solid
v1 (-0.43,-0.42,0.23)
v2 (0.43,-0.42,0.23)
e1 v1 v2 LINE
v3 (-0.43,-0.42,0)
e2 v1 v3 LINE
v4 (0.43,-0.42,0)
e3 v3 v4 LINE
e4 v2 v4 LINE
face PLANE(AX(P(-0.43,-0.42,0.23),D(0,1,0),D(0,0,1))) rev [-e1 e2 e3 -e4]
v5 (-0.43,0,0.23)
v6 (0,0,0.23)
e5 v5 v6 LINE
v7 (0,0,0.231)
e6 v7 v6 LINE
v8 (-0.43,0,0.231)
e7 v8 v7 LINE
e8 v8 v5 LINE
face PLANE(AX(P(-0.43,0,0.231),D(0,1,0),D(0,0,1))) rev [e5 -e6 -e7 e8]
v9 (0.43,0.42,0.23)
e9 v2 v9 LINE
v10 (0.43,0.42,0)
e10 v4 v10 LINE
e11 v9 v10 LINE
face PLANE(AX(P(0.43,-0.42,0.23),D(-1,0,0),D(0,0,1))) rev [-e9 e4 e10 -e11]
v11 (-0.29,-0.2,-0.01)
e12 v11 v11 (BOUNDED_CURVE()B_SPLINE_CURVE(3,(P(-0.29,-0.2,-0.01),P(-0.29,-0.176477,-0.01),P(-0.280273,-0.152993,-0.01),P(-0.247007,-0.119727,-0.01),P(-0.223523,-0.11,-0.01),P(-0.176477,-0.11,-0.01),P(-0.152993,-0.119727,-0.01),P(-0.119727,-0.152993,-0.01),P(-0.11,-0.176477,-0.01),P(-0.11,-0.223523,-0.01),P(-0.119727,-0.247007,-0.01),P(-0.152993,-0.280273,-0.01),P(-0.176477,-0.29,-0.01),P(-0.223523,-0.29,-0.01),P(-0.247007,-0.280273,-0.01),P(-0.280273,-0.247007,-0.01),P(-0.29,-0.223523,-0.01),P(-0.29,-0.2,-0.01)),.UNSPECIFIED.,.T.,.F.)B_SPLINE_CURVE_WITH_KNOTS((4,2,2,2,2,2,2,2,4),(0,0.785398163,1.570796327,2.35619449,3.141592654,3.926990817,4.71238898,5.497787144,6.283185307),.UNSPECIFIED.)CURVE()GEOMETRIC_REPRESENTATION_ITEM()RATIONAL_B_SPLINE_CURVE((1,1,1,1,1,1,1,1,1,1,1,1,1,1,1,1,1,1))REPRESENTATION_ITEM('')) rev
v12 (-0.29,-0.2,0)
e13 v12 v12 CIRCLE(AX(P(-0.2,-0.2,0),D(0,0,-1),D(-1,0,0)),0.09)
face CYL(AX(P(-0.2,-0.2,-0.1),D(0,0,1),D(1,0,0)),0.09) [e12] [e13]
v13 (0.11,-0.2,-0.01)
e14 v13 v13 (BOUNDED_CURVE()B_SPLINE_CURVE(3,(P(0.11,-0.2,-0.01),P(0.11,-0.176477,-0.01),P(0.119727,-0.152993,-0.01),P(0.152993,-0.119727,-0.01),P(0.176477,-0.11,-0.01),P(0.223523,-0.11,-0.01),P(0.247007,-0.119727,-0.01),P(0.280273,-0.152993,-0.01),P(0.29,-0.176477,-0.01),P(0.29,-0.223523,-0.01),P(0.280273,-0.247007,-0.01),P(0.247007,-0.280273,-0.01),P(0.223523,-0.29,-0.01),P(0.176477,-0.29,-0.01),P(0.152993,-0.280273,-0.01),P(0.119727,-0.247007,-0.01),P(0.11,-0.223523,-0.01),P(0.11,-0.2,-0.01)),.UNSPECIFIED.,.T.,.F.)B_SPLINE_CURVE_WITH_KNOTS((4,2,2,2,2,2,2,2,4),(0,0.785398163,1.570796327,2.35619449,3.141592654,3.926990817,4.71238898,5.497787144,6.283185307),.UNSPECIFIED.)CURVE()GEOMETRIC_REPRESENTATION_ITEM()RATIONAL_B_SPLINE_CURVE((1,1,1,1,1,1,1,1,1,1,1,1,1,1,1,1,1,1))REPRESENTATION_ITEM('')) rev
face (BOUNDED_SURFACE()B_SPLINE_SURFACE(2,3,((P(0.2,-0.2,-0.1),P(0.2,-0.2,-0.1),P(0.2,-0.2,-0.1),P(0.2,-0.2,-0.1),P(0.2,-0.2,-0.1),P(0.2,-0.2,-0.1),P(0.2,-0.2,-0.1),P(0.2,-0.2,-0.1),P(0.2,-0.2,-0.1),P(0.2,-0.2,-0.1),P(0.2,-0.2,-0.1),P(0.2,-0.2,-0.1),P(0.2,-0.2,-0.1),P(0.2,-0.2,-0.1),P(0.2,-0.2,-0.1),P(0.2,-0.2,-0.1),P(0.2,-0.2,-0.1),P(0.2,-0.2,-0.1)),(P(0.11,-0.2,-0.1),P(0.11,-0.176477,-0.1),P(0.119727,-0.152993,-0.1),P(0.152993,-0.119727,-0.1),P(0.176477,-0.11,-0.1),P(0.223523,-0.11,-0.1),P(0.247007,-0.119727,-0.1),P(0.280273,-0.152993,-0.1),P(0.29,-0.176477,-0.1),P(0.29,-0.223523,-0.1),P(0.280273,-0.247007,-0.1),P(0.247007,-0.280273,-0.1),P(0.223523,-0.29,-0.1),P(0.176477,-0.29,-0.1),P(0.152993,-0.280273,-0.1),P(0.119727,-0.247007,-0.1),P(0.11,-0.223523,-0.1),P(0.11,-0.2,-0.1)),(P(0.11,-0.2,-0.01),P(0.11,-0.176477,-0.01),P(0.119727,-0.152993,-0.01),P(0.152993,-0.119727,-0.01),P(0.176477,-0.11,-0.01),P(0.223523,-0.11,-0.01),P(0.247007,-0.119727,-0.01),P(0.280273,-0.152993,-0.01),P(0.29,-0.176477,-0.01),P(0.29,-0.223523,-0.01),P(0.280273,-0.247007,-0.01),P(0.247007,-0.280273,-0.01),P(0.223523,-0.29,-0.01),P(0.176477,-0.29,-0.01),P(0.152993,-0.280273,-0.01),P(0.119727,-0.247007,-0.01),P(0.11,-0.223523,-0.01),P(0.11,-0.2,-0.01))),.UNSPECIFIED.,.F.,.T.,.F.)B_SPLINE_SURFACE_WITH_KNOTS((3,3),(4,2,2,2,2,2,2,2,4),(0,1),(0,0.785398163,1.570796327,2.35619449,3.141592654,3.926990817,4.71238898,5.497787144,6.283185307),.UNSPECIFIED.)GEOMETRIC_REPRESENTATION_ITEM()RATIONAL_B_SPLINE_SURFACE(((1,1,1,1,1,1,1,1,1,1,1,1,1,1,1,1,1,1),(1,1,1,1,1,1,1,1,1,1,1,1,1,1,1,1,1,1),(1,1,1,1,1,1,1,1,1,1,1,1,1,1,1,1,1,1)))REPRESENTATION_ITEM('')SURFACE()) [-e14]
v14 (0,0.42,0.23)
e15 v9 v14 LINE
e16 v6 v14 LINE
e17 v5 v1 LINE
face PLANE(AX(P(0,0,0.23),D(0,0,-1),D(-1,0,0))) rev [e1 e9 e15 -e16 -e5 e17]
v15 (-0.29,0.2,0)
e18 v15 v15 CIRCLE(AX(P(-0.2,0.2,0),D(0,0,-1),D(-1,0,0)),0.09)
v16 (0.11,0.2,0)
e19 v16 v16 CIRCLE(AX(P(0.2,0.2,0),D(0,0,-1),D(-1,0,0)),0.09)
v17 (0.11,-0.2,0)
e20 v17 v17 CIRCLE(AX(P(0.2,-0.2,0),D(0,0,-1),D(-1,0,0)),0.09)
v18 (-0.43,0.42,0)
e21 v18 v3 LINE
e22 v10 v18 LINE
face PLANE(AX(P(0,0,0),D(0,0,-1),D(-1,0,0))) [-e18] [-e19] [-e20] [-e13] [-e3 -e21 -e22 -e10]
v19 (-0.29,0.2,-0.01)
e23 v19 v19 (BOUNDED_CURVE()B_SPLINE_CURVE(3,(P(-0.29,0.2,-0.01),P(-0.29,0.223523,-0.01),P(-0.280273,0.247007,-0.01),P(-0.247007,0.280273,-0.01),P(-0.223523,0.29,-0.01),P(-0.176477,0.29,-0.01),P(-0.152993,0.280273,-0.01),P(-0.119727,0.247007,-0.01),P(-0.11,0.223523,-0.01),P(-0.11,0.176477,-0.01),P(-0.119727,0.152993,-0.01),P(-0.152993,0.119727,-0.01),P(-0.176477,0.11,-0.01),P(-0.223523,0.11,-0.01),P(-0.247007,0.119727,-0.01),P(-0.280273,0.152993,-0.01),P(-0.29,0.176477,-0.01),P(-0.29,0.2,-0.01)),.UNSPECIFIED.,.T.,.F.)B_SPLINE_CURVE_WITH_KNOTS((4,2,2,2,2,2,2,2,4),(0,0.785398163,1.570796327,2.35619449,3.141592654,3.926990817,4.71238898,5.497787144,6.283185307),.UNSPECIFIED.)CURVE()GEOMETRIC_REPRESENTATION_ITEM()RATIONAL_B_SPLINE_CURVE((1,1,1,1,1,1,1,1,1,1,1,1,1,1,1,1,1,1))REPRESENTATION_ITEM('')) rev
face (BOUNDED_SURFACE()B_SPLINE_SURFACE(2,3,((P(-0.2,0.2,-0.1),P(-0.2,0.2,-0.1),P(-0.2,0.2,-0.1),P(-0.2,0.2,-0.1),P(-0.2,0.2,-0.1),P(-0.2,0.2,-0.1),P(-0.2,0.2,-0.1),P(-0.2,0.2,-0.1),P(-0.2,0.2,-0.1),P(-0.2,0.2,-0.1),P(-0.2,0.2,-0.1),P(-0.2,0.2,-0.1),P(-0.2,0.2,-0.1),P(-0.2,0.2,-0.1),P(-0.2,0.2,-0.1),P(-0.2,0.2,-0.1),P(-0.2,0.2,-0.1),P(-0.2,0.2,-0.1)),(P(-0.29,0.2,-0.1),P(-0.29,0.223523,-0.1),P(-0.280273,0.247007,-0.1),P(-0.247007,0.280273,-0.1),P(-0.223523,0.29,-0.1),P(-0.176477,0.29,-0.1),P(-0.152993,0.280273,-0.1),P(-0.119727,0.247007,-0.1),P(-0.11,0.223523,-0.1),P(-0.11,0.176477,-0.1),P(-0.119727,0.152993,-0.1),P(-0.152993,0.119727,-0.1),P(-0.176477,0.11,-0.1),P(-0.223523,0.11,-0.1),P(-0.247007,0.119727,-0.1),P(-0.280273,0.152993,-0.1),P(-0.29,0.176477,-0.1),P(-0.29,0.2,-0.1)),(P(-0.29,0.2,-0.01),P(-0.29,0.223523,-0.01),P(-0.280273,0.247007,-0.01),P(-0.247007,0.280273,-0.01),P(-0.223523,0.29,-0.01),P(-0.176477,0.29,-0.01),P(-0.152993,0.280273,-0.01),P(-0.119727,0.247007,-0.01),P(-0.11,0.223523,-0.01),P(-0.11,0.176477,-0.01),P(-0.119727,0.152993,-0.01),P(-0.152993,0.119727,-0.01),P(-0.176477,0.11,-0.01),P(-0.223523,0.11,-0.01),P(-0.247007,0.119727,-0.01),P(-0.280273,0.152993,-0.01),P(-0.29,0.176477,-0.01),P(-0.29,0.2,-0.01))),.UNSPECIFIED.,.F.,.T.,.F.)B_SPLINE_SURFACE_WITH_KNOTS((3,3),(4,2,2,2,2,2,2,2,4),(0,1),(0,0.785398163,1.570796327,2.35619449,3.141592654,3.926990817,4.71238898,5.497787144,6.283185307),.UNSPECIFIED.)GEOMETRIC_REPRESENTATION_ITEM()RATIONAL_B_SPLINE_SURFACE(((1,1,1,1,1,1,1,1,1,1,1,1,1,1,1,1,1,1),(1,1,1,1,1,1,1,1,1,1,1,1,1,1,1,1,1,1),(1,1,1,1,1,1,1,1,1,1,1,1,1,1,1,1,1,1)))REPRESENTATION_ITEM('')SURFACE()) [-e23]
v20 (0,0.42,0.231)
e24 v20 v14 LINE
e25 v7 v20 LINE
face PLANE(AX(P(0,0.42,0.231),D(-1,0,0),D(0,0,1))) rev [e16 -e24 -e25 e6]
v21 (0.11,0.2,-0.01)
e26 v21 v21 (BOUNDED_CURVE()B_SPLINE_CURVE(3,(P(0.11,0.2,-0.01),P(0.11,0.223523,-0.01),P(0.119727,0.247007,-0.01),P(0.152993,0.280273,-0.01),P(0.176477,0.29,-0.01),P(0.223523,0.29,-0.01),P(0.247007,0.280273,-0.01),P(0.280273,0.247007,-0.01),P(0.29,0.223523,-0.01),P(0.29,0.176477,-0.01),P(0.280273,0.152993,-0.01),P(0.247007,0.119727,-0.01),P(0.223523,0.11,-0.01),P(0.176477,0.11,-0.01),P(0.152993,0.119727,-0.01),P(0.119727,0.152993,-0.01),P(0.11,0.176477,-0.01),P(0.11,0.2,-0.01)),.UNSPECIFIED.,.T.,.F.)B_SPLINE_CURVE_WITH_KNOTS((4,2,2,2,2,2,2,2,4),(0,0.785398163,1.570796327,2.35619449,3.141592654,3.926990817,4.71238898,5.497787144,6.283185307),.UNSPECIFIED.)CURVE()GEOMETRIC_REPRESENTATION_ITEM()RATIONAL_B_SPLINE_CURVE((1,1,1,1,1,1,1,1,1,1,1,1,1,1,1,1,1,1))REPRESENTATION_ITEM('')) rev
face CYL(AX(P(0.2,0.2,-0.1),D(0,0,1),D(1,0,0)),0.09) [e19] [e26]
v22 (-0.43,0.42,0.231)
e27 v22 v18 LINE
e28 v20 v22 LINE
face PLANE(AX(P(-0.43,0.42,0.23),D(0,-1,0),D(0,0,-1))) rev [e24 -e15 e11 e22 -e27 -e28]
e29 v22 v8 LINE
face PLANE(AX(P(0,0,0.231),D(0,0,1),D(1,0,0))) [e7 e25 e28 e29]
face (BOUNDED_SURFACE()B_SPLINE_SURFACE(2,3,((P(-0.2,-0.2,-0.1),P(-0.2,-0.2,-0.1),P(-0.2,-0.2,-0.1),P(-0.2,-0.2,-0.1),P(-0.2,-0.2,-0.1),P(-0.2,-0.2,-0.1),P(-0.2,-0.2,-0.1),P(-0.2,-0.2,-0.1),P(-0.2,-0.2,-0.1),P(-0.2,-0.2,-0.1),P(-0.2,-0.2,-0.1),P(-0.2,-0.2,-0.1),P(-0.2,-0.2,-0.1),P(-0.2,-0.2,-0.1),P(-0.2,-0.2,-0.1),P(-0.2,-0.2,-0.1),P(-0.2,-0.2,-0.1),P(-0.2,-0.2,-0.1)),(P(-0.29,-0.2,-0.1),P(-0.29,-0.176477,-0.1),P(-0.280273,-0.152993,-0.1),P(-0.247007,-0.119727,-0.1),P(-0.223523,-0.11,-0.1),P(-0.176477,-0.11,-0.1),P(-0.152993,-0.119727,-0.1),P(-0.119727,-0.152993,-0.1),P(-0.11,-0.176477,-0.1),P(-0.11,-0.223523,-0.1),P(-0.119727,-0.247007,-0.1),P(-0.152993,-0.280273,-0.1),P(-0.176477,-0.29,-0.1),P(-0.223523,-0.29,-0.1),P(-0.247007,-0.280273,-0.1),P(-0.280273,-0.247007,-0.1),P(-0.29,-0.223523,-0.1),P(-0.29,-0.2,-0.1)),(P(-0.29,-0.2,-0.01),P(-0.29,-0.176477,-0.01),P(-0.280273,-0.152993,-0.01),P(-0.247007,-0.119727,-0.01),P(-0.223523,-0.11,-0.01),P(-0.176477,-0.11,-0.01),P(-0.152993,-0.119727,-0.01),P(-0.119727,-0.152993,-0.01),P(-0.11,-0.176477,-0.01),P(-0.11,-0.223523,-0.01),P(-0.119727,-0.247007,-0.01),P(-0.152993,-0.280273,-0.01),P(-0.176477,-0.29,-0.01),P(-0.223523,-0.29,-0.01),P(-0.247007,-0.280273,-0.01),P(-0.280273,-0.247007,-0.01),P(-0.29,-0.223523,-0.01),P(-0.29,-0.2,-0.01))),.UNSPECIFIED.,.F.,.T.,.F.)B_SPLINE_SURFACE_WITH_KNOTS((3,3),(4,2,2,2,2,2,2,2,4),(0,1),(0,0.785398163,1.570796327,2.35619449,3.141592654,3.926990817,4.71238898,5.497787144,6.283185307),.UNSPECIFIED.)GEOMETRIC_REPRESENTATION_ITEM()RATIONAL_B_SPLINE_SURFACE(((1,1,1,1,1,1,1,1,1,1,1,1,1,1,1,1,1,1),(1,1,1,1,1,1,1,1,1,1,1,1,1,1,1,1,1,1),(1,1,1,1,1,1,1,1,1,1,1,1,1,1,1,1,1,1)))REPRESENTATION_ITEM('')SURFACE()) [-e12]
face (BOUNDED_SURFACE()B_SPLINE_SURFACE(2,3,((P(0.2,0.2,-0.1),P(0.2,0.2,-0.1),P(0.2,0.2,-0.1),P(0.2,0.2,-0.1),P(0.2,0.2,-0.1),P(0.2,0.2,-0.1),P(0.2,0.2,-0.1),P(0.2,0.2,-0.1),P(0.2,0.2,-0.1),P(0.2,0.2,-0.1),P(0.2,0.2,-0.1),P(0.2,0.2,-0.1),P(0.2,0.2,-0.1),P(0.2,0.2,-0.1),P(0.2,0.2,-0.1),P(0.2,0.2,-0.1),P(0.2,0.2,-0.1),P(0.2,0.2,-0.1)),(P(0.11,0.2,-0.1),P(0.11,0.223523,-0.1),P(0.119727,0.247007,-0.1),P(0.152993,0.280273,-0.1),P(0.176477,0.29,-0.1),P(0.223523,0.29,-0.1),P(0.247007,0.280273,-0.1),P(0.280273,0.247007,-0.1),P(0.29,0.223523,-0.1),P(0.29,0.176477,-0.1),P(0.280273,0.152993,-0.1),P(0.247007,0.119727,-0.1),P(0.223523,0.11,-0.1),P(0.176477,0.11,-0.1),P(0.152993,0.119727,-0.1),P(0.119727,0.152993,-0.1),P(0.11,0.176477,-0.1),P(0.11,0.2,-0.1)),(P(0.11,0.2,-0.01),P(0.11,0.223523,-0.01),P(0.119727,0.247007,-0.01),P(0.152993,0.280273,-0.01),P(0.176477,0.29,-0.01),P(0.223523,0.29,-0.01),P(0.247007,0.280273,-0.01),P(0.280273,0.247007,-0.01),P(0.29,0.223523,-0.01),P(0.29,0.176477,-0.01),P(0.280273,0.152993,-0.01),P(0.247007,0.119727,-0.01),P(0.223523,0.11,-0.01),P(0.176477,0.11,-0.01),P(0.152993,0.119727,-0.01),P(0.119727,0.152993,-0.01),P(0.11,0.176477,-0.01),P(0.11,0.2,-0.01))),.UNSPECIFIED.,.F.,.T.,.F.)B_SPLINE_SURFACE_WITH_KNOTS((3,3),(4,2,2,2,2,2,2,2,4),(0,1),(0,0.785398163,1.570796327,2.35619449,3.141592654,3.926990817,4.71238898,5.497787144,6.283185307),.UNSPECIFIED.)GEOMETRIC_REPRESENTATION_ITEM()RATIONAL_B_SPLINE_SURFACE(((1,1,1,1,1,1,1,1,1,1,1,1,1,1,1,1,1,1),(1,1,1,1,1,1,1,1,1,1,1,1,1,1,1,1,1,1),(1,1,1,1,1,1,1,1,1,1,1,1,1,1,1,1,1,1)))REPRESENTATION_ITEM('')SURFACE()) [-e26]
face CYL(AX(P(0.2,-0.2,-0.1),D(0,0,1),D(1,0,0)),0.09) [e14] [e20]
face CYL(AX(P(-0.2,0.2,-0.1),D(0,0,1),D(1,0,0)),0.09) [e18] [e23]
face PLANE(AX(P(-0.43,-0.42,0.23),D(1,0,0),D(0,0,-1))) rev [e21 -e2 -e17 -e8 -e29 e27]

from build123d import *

# Parameters (mm, degrees)
SKETCH1_W                 = 0.86
SKETCH1_H                 = 0.84
BOSS_EXTRUDE1_DEPTH       = 0.23
SKETCH2_W                 = 0.43
SKETCH2_H                 = 0.42
BOSS_EXTRUDE2_DEPTH       = 0.001
SKETCH3_R                 = 0.09
BOSS_EXTRUDE3_DEPTH       = 0.1
FILLET1_SIZE              = 0.09
LPATTERN2_COUNT           = 2
LPATTERN2_PITCH           = 0.4
LPATTERN2_COUNT_DIR2      = 2
LPATTERN2_PITCH_DIR2      = 0.4
FILLET1_OF_LPATTERN2_SIZE = 0.09


with BuildPart() as part:
    # Sketch1 → Boss-Extrude1 (new body)
    with BuildSketch(Plane.XY):
        Rectangle(SKETCH1_W, SKETCH1_H)
    extrude(amount=BOSS_EXTRUDE1_DEPTH)

    # Sketch2 → Boss-Extrude2 (add)
    with BuildSketch(Plane.XY.offset(0.23)):
        with Locations((-0.215, 0.21)):
            Rectangle(SKETCH2_W, SKETCH2_H)
    extrude(amount=BOSS_EXTRUDE2_DEPTH)

    # Sketch3 → Boss-Extrude3 (add)
    with BuildSketch(Plane(origin=(0, 0, 0), x_dir=(-1, 0, 0), z_dir=(0, 0, -1))):
        with Locations((-0.2, 0.2)):
            Circle(SKETCH3_R)
    boss_extrude3 = extrude(amount=BOSS_EXTRUDE3_DEPTH)

    # Fillet1
    # a fillet whose section is not a circle: 0.09 mm, written as the material it takes off along each edge
    with BuildSketch(Plane(origin=(0.2, 0.2, -0.1), x_dir=(-1, 0, 0), z_dir=(0, -1, 0))) as fillet1_piece_1:
        with BuildLine():
            Bezier((0.09, -FILLET1_SIZE), (0.09, 0), (0.09 - FILLET1_SIZE, 0), weights=[1, 1, 1])
            Line((0.09 - FILLET1_SIZE, 0), (0.09, 0))
            Line((0.09, 0), (0.09, -FILLET1_SIZE))
        make_face()
    revolve(axis=Axis((0.2, 0.2, -0.1), (0, 0, -1)), mode=Mode.SUBTRACT)

    # LPattern2: Boss-Extrude3 2 × 2
    with Locations(*[(-i * LPATTERN2_PITCH, -j * LPATTERN2_PITCH_DIR2, 0) for i in range(LPATTERN2_COUNT) for j in range(LPATTERN2_COUNT_DIR2) if (i, j) != (0, 0)]):
        add(boss_extrude3)

    # Fillet1 of LPattern2
    # a fillet whose section is not a circle: 0.09 mm, written as the material it takes off along each edge
    with BuildSketch(Plane(origin=(0.2, -0.2, -0.1), x_dir=(-1, 0, 0), z_dir=(0, -1, 0))) as fillet1_of_lpattern2_piece_1:
        with BuildLine():
            Bezier((0.09, -FILLET1_OF_LPATTERN2_SIZE), (0.09, 0), (0.09 - FILLET1_OF_LPATTERN2_SIZE, 0), weights=[1, 1, 1])
            Line((0.09 - FILLET1_OF_LPATTERN2_SIZE, 0), (0.09, 0))
            Line((0.09, 0), (0.09, -FILLET1_OF_LPATTERN2_SIZE))
        make_face()
    revolve(axis=Axis((0.2, -0.2, -0.1), (0, 0, -1)), mode=Mode.SUBTRACT)
    with BuildSketch(Plane(origin=(-0.2, 0.2, -0.1), x_dir=(-1, 0, 0), z_dir=(0, -1, 0))) as fillet1_of_lpattern2_piece_2:
        with BuildLine():
            Bezier((0.09, -FILLET1_OF_LPATTERN2_SIZE), (0.09, 0), (0.09 - FILLET1_OF_LPATTERN2_SIZE, 0), weights=[1, 1, 1])
            Line((0.09 - FILLET1_OF_LPATTERN2_SIZE, 0), (0.09, 0))
            Line((0.09, 0), (0.09, -FILLET1_OF_LPATTERN2_SIZE))
        make_face()
    revolve(axis=Axis((-0.2, 0.2, -0.1), (0, 0, -1)), mode=Mode.SUBTRACT)
    with BuildSketch(Plane(origin=(-0.2, -0.2, -0.1), x_dir=(-1, 0, 0), z_dir=(0, -1, 0))) as fillet1_of_lpattern2_piece_3:
        with BuildLine():
            Bezier((0.09, -FILLET1_OF_LPATTERN2_SIZE), (0.09, 0), (0.09 - FILLET1_OF_LPATTERN2_SIZE, 0), weights=[1, 1, 1])
            Line((0.09 - FILLET1_OF_LPATTERN2_SIZE, 0), (0.09, 0))
            Line((0.09, 0), (0.09, -FILLET1_OF_LPATTERN2_SIZE))
        make_face()
    revolve(axis=Axis((-0.2, -0.2, -0.1), (0, 0, -1)), mode=Mode.SUBTRACT)


solid = part.part
